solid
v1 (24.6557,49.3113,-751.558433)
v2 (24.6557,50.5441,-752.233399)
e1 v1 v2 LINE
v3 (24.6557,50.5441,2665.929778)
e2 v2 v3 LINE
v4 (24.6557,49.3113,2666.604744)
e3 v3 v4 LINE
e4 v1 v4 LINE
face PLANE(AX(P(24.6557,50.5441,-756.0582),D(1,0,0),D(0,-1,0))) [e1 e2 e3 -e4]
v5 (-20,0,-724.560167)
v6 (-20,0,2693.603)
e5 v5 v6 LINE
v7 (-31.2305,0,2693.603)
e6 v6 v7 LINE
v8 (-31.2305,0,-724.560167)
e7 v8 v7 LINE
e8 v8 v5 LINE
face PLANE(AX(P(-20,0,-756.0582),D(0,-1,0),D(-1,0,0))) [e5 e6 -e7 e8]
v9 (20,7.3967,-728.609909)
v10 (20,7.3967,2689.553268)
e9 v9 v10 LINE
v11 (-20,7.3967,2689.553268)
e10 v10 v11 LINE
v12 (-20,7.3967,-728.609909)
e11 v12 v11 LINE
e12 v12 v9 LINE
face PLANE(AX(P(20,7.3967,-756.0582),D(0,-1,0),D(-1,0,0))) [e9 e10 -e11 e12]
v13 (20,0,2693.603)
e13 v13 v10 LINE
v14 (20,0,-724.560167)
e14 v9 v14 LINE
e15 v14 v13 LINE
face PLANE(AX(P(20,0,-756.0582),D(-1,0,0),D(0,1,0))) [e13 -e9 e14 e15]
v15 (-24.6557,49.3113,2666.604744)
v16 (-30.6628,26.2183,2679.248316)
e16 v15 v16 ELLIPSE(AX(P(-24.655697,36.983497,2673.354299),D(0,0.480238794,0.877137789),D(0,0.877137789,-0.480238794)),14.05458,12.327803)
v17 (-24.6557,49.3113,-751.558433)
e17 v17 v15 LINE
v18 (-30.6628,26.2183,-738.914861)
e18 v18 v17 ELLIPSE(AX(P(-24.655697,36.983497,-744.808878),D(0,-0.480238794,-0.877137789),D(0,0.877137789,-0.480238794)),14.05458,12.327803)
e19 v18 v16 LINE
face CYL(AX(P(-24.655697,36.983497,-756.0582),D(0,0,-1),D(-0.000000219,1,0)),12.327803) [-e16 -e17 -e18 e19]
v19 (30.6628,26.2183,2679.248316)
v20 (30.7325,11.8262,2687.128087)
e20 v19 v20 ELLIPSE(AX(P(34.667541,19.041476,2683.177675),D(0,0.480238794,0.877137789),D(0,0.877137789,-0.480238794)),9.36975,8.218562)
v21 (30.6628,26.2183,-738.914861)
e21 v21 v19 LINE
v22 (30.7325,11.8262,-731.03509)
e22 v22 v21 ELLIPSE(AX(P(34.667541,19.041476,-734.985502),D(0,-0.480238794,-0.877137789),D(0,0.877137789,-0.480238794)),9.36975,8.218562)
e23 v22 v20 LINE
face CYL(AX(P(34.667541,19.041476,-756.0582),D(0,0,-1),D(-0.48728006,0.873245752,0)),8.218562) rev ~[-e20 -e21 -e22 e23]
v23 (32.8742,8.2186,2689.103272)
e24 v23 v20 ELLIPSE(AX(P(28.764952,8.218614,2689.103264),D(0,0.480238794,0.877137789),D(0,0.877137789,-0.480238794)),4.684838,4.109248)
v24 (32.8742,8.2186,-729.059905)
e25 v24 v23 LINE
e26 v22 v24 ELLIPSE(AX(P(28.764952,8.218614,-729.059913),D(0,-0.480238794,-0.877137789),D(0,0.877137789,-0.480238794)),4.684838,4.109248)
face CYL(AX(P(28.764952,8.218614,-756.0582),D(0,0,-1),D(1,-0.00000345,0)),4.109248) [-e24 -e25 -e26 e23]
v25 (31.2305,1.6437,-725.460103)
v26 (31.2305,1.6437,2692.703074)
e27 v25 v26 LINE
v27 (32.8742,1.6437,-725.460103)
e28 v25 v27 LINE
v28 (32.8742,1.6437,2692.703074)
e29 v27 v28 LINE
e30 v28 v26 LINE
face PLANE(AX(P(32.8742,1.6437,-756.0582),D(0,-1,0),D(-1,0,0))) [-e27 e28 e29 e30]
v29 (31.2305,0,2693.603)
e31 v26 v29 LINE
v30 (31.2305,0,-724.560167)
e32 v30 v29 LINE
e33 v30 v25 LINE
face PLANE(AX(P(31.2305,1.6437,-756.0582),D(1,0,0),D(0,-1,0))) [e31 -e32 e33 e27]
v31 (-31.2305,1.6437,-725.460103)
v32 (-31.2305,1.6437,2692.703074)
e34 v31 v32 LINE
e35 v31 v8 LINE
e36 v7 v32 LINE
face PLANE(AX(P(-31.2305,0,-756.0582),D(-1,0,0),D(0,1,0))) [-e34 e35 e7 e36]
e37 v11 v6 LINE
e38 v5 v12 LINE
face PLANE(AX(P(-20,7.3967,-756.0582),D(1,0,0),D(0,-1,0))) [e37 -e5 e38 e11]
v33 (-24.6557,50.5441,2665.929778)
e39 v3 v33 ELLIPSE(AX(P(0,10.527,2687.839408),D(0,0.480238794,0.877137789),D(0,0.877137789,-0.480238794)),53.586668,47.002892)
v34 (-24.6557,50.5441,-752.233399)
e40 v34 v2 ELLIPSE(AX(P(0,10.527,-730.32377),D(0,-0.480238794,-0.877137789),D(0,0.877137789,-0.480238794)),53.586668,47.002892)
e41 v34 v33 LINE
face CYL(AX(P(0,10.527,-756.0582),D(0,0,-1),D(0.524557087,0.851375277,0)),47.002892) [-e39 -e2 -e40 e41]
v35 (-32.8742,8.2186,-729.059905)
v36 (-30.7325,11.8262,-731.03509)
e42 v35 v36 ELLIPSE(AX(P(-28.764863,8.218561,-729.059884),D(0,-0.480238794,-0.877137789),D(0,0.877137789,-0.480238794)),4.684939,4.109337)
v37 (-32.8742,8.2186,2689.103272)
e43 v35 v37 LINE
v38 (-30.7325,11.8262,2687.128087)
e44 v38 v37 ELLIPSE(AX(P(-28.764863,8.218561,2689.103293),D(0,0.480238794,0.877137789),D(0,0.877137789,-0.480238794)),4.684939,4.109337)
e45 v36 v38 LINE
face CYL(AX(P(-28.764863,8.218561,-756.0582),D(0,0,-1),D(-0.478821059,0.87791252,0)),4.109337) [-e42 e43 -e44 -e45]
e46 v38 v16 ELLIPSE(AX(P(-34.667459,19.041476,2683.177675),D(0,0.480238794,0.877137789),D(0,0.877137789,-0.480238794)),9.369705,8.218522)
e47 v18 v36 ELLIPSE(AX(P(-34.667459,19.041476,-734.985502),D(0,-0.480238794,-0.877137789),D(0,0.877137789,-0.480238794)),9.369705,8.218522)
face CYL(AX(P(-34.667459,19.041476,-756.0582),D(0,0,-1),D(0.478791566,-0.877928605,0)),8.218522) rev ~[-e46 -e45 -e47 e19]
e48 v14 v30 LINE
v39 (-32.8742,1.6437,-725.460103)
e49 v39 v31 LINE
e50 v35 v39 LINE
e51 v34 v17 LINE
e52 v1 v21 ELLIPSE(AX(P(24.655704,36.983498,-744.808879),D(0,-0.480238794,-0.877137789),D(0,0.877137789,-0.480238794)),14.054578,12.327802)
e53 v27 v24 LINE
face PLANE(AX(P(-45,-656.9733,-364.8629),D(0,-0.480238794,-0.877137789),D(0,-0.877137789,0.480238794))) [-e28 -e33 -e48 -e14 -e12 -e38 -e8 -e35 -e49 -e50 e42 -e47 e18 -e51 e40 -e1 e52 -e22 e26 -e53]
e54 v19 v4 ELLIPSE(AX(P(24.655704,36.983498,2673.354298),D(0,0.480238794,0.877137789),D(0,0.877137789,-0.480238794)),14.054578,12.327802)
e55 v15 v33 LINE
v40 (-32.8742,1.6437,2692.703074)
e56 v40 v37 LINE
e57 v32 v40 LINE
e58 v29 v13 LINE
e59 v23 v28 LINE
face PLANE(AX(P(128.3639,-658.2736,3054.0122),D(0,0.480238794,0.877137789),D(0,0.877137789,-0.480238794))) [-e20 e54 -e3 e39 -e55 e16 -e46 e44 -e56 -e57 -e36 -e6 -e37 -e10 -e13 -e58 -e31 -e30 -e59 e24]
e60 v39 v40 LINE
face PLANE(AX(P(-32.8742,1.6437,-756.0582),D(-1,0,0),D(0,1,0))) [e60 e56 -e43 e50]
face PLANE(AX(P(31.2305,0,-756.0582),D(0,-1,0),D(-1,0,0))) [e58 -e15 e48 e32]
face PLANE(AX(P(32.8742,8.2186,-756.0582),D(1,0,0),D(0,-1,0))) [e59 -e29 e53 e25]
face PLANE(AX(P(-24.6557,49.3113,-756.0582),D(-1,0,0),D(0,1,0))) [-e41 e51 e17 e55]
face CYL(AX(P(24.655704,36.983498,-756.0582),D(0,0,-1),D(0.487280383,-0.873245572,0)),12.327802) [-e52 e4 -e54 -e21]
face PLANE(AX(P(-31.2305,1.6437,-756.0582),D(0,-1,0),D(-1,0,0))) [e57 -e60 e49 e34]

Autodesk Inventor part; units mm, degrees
sketch "Поручень" plane through (0, 0, 0) normal (0, 0, 1) x (1, 0, 0)
  line L0 (20.3655, -7.6059) -> (20.3655, -0.2092)
  line L1 (20.3655, -0.2092) -> (-19.6345, -0.2092)
  line L2 (-19.6345, -0.2092) -> (-19.6345, -7.6059)
  line L3 (-19.6345, -7.6059) -> (-30.865, -7.6059)
  line L4 (-30.865, -7.6059) -> (-30.865, -5.9622)
  line L5 (-30.865, -5.9622) -> (-32.5087, -5.9622)
  line L6 (-32.5087, -5.9622) -> (-32.5087, 0.6126)
  arc A0 (-30.367, 4.2203) -> (-32.5087, 0.6126) centre (-28.3995, 0.6126) ccw
  arc A1 (-30.367, 4.2203) -> (-30.2973, 18.6123) centre (-34.302, 11.4355) ccw
  arc A2 (-24.2902, 41.7054) -> (-30.2973, 18.6123) centre (-24.2902, 29.3776) ccw
  line L7 (-24.2902, 41.7054) -> (-24.2902, 42.9382)
  arc A3 (25.0211, 42.9382) -> (-24.2902, 42.9382) centre (0.3655, 2.9211) ccw
  line L8 (25.0211, 42.9382) -> (25.0211, 41.7054)
  arc A4 (31.0282, 18.6123) -> (25.0211, 41.7054) centre (25.0211, 29.3776) ccw
  arc A5 (31.0282, 18.6123) -> (31.0979, 4.2203) centre (35.033, 11.4355) ccw
  arc A6 (33.2397, 0.6126) -> (31.0979, 4.2203) centre (29.1304, 0.6126) ccw
  line L9 (33.2397, 0.6126) -> (33.2397, -5.9622)
  line L10 (33.2397, -5.9622) -> (31.596, -5.9622)
  line L11 (31.596, -5.9622) -> (31.596, -7.6059)
  line L12 (31.596, -7.6059) -> (20.3655, -7.6059)
  point P0 (0.3655, -0.2092)
  point P1 (0.3655, -7.6059)
sketch "Эскиз" plane through (0, 0, 0) normal (0, 0, 1) x (1, 0, 0)
  line L0 (20, 0) -> (20, 7.3967)
  line L1 (20, 7.3967) -> (-20, 7.3967)
  line L2 (-20, 7.3967) -> (-20, 0)
  line L3 (-20, 0) -> (-31.2305, 0)
  line L4 (-31.2305, 0) -> (-31.2305, 1.6437)
  line L5 (-31.2305, 1.6437) -> (-32.8742, 1.6437)
  line L6 (-32.8742, 1.6437) -> (-32.8742, 8.2186)
  arc A0 (-30.7325, 11.8262) -> (-32.8742, 8.2186) centre (-28.7649, 8.2186) ccw
  arc A1 (-30.7325, 11.8262) -> (-30.6628, 26.2183) centre (-34.6675, 19.0415) ccw
  arc A2 (-24.6557, 49.3113) -> (-30.6628, 26.2183) centre (-24.6557, 36.9835) ccw
  line L7 (-24.6557, 49.3113) -> (-24.6557, 50.5441)
  arc A3 (24.6557, 50.5441) -> (-24.6557, 50.5441) centre (0, 10.527) ccw
  line L8 (24.6557, 50.5441) -> (24.6557, 49.3113)
  arc A4 (30.6628, 26.2183) -> (24.6557, 49.3113) centre (24.6557, 36.9835) ccw
  arc A5 (30.6628, 26.2183) -> (30.7325, 11.8262) centre (34.6675, 19.0415) ccw
  arc A6 (32.8742, 8.2186) -> (30.7325, 11.8262) centre (28.7649, 8.2186) ccw
  line L9 (32.8742, 8.2186) -> (32.8742, 1.6437)
  line L10 (32.8742, 1.6437) -> (31.2305, 1.6437)
  line L11 (31.2305, 1.6437) -> (31.2305, 0)
  line L12 (31.2305, 0) -> (20, 0)
  point P0 (0, 0)
ref_plane "Начальная плоскость" through (0, 0, -756.0582) normal (0, 0, 1) x (1, 0, 0)
ref_plane "РабПлоскость2" through (0, 0, 1691.8665) normal (0, 0, 1) x (1, 0, 0)
extrude "Тело" add sketch "Эскиз" along normal up to surface (3449.6612 mm away) from surface at -756.0582
ref_plane "Конечная плоскость" through (0, 0, 2693.603) normal (0, 0, 1) x (1, 0, 0)
ref_plane "РабПлоскость4" through (128.3639, -658.2736, 3054.0122) normal (0, 0.4802388, 0.8771378) x (1, 0, 0)
split "Разделение1" plane through (128.3639, -658.2736, 3054.0122) removes the side toward (0, 0.4802388, 0.8771378)
ref_plane "РабПлоскость5" through (-45, -656.9733, -364.8629) normal (0, -0.4802388, -0.8771378) x (1, 0, 0)
split "Разделение2" plane through (-45, -656.9733, -364.8629) removes the side toward (0, -0.4802388, -0.8771378)
equation "\"ШИРИНА\" = 75"
equation "\"ТОЛЩВЫС\" = 58"
equation "\"d0\" = -G_OFFSET_START"
equation "\"СЕЧЕНИЕ_СМЕЩ\" = 0"
equation "\"G_OFFSET_END\" = 1001.73648"
equation "\"d4\" = ДЛИНА + G_OFFSET_END"
equation "\"G_OFFSET_START\" = 756.05818"
equation "\"G_L\" = ДЛИНА + G_OFFSET_START + G_OFFSET_END"
equation "\"ДЛИНА\" = 1691.866499"
properties part number "Поручень" material "Древесина (дуб)"
